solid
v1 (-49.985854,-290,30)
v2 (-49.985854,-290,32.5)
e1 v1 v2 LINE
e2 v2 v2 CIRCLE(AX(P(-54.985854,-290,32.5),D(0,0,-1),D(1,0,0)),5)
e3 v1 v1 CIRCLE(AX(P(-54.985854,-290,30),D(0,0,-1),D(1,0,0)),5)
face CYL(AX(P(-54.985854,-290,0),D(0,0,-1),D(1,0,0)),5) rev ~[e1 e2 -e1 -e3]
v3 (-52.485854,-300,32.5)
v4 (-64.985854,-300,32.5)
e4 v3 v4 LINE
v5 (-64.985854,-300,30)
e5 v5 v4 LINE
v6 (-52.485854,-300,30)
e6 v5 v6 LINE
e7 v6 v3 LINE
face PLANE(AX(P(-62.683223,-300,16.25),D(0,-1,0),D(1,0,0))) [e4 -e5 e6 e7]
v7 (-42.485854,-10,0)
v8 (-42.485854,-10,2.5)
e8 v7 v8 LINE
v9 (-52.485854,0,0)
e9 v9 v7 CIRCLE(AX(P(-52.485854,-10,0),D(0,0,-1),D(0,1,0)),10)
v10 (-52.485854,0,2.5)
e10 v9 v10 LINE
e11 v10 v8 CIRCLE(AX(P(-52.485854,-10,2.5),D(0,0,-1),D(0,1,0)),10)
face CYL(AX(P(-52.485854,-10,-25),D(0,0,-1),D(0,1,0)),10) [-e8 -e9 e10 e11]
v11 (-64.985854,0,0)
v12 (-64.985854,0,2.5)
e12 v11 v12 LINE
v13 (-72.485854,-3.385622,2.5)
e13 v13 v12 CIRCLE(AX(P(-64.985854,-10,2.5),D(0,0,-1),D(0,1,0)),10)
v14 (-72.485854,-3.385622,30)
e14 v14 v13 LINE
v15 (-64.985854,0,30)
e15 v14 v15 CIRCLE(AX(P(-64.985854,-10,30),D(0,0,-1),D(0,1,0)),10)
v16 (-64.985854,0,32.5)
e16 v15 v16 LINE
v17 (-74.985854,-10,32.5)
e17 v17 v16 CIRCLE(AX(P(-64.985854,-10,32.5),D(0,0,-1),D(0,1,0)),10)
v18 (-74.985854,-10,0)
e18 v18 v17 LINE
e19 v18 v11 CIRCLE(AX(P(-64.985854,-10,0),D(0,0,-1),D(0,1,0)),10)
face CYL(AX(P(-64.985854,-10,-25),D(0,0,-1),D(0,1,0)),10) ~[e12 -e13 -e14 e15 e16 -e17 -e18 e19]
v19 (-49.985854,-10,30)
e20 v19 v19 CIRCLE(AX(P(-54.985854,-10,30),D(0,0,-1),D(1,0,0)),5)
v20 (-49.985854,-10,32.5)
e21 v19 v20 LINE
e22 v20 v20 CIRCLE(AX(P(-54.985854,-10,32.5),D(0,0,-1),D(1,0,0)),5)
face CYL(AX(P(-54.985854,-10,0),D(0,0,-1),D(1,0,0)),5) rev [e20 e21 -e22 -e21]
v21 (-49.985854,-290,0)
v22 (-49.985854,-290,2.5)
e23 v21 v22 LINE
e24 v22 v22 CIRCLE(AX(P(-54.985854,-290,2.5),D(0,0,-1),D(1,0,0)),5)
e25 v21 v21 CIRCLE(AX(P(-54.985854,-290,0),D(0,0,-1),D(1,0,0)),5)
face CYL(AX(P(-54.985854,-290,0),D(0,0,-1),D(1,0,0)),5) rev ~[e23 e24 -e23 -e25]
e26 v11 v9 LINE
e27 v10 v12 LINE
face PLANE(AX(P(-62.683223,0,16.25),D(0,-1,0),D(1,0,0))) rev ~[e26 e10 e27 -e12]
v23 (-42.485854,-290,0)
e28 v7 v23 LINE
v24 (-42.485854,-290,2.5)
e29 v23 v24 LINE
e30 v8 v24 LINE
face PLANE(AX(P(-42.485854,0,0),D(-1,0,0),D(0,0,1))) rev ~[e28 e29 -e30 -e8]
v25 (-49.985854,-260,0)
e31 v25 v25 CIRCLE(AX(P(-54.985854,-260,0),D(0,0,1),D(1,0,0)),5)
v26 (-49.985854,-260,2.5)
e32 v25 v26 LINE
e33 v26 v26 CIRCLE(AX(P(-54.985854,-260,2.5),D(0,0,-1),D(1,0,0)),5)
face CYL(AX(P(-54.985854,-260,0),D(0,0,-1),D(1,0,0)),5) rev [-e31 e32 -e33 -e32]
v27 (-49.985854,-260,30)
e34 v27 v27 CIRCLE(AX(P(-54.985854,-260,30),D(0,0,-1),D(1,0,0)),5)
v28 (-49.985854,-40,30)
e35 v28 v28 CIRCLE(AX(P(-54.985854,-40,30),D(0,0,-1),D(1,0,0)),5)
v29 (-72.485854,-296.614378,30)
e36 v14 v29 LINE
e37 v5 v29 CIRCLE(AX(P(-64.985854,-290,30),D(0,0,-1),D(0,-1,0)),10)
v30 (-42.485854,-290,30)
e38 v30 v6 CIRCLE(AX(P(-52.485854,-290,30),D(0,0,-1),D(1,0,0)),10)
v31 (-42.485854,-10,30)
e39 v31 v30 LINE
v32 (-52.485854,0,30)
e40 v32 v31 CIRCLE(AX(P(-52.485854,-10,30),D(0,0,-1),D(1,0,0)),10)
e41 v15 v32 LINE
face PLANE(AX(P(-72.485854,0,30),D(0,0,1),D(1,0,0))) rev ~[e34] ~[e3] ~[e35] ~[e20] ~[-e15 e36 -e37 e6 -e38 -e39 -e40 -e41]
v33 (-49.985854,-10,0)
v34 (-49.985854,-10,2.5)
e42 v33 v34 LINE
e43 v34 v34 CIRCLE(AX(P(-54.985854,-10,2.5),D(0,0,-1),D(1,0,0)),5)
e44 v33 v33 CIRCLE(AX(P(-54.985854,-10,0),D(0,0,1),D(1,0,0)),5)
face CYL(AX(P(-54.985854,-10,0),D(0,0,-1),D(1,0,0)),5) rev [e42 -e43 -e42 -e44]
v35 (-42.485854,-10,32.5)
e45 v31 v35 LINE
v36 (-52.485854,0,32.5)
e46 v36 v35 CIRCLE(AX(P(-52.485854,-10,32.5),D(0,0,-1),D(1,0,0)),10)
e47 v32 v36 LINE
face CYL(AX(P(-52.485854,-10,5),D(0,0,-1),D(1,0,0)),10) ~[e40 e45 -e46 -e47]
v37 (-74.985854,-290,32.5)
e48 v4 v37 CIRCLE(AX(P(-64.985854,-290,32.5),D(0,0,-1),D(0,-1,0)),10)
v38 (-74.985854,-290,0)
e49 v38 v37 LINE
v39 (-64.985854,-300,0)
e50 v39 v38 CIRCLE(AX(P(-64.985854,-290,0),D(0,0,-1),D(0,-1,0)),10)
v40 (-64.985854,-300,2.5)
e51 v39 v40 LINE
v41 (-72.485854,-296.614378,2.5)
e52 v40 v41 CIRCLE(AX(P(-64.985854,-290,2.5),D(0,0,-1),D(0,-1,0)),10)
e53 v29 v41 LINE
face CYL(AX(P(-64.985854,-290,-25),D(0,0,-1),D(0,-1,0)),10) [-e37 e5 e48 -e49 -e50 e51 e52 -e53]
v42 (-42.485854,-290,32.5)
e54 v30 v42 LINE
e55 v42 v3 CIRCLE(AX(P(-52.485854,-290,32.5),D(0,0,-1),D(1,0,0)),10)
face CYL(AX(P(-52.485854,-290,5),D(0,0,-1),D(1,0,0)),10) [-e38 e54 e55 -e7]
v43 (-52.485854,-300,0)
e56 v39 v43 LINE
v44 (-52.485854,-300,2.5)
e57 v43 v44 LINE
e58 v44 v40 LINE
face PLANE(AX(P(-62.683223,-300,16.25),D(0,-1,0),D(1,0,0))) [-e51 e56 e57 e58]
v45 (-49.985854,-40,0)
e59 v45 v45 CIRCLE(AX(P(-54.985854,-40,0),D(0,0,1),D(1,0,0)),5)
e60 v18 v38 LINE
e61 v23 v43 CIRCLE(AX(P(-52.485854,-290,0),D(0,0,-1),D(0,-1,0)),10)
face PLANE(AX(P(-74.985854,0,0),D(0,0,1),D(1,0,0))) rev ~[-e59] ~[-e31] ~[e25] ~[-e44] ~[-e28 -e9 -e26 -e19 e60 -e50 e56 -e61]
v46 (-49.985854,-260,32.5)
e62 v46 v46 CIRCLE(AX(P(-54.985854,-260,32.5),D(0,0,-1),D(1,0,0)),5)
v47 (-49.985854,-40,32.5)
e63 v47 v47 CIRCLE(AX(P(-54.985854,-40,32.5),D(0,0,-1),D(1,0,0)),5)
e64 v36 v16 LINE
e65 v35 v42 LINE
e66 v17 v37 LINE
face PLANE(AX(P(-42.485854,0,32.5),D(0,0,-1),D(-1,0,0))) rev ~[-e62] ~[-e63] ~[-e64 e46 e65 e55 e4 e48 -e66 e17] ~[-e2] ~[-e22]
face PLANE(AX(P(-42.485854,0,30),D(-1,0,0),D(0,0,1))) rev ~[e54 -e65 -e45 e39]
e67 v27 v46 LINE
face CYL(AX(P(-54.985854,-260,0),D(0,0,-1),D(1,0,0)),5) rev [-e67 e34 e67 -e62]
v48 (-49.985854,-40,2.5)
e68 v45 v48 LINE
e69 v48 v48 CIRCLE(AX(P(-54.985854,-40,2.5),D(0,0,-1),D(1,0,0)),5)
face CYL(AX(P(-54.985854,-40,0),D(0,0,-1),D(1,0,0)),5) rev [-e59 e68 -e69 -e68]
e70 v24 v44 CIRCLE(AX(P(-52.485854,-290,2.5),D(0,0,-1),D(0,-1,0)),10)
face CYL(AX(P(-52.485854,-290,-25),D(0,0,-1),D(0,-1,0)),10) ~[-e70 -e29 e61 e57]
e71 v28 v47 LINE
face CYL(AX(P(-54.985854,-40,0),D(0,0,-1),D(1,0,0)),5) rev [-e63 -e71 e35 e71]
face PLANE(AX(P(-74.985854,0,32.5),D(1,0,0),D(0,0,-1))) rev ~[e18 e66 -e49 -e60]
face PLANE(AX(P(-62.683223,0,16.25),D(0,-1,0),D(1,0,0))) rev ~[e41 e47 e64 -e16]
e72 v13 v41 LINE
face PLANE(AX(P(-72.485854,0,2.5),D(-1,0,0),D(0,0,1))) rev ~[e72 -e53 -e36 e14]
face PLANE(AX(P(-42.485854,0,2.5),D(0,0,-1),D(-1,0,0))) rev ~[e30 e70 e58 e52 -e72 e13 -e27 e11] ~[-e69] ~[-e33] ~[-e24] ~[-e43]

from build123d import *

# Parameters (mm, degrees)
F2_DEPTH    = 300
F1_R        = 5
F3_DEPTH    = 46
F4_T1_DEPTH = 52.5
F4_T3_DEPTH = 52.5
F4_T5_DEPTH = 82.5


# Not quite as in the source:
# - a fillet or chamfer that OpenCascade refuses, or shapes differently, is made with other operations: its cross-section is extruded or revolved along the edge and cut away or added
# - a pattern or mirror of a feature is missing from the dataset's text; its kind, count and spacing are read off the source's solid


with BuildPart() as f2:
    # F0 (on Front) → F2 (new body)
    with BuildSketch(Plane.XZ):
        Polygon((-74.9858543277, 32.5), (-74.9858543277, 0), (-42.4858543277, 0), (-42.4858543277, 2.5), (-72.4858543277, 2.5), (-72.4858543277, 30), (-42.4858543277, 30), (-42.4858543277, 32.5), align=None)
    extrude(amount=F2_DEPTH)

    # F1 (on Top) → F3 (cut)
    with BuildSketch(Plane.XY):
        with Locations((-54.9858543277, -260)):
            Circle(F1_R)
        with Locations((-54.9858543277, -40)):
            Circle(F1_R)
        with Locations((-54.9858543277, -10)):
            Circle(F1_R)
    f3 = extrude(amount=F3_DEPTH, mode=Mode.SUBTRACT)

    # F3_copies: F3 across plane
    add(f3.mirror(Plane(origin=(0, -275, 0), x_dir=(0, 0, -1), z_dir=(0, -1, 0))), mode=Mode.SUBTRACT)

    # F4: fillet of radius 10 on 6 edges, made by hand

    # F4_s2 → F4_t1 (cut)
    with BuildSketch(Plane.XY.offset(-25)):
        with BuildLine():
            ThreePointArc((-52.4858543277, 0), (-45.4147865158, -2.9289321881), (-42.4858543277, -10))
            Line((-42.4858543277, -10), (-42.4858543277, 0))
            Line((-42.4858543277, 0), (-52.4858543277, 0))
        make_face()
        with BuildLine():
            ThreePointArc((-52.4858543277, -300), (-45.4147865158, -297.0710678119), (-42.4858543277, -290))
            Line((-42.4858543277, -290), (-42.4858543277, -300))
            Line((-42.4858543277, -300), (-52.4858543277, -300))
        make_face()
    extrude(amount=F4_T1_DEPTH, mode=Mode.SUBTRACT)

    # F4_s4 → F4_t3 (cut)
    with BuildSketch(Plane.XY.offset(5)):
        with BuildLine():
            ThreePointArc((-42.4858543277, -10), (-45.4147865158, -2.9289321881), (-52.4858543277, 0))
            Line((-52.4858543277, 0), (-42.4858543277, 0))
            Line((-42.4858543277, 0), (-42.4858543277, -10))
        make_face()
        with BuildLine():
            ThreePointArc((-42.4858543277, -290), (-45.4147865158, -297.0710678119), (-52.4858543277, -300))
            Line((-52.4858543277, -300), (-42.4858543277, -300))
            Line((-42.4858543277, -300), (-42.4858543277, -290))
        make_face()
    extrude(amount=F4_T3_DEPTH, mode=Mode.SUBTRACT)

    # F4_s6 → F4_t5 (cut)
    with BuildSketch(Plane.XY.offset(-25)):
        with BuildLine():
            ThreePointArc((-64.9858543277, 0), (-72.0569221395, -2.9289321881), (-74.9858543277, -10))
            Line((-74.9858543277, -10), (-74.9858543277, 0))
            Line((-74.9858543277, 0), (-64.9858543277, 0))
        make_face()
        with BuildLine():
            ThreePointArc((-64.9858543277, -300), (-72.0569221395, -297.0710678119), (-74.9858543277, -290))
            Line((-74.9858543277, -290), (-74.9858543277, -300))
            Line((-74.9858543277, -300), (-64.9858543277, -300))
        make_face()
    extrude(amount=F4_T5_DEPTH, mode=Mode.SUBTRACT)


solid = f2.part
